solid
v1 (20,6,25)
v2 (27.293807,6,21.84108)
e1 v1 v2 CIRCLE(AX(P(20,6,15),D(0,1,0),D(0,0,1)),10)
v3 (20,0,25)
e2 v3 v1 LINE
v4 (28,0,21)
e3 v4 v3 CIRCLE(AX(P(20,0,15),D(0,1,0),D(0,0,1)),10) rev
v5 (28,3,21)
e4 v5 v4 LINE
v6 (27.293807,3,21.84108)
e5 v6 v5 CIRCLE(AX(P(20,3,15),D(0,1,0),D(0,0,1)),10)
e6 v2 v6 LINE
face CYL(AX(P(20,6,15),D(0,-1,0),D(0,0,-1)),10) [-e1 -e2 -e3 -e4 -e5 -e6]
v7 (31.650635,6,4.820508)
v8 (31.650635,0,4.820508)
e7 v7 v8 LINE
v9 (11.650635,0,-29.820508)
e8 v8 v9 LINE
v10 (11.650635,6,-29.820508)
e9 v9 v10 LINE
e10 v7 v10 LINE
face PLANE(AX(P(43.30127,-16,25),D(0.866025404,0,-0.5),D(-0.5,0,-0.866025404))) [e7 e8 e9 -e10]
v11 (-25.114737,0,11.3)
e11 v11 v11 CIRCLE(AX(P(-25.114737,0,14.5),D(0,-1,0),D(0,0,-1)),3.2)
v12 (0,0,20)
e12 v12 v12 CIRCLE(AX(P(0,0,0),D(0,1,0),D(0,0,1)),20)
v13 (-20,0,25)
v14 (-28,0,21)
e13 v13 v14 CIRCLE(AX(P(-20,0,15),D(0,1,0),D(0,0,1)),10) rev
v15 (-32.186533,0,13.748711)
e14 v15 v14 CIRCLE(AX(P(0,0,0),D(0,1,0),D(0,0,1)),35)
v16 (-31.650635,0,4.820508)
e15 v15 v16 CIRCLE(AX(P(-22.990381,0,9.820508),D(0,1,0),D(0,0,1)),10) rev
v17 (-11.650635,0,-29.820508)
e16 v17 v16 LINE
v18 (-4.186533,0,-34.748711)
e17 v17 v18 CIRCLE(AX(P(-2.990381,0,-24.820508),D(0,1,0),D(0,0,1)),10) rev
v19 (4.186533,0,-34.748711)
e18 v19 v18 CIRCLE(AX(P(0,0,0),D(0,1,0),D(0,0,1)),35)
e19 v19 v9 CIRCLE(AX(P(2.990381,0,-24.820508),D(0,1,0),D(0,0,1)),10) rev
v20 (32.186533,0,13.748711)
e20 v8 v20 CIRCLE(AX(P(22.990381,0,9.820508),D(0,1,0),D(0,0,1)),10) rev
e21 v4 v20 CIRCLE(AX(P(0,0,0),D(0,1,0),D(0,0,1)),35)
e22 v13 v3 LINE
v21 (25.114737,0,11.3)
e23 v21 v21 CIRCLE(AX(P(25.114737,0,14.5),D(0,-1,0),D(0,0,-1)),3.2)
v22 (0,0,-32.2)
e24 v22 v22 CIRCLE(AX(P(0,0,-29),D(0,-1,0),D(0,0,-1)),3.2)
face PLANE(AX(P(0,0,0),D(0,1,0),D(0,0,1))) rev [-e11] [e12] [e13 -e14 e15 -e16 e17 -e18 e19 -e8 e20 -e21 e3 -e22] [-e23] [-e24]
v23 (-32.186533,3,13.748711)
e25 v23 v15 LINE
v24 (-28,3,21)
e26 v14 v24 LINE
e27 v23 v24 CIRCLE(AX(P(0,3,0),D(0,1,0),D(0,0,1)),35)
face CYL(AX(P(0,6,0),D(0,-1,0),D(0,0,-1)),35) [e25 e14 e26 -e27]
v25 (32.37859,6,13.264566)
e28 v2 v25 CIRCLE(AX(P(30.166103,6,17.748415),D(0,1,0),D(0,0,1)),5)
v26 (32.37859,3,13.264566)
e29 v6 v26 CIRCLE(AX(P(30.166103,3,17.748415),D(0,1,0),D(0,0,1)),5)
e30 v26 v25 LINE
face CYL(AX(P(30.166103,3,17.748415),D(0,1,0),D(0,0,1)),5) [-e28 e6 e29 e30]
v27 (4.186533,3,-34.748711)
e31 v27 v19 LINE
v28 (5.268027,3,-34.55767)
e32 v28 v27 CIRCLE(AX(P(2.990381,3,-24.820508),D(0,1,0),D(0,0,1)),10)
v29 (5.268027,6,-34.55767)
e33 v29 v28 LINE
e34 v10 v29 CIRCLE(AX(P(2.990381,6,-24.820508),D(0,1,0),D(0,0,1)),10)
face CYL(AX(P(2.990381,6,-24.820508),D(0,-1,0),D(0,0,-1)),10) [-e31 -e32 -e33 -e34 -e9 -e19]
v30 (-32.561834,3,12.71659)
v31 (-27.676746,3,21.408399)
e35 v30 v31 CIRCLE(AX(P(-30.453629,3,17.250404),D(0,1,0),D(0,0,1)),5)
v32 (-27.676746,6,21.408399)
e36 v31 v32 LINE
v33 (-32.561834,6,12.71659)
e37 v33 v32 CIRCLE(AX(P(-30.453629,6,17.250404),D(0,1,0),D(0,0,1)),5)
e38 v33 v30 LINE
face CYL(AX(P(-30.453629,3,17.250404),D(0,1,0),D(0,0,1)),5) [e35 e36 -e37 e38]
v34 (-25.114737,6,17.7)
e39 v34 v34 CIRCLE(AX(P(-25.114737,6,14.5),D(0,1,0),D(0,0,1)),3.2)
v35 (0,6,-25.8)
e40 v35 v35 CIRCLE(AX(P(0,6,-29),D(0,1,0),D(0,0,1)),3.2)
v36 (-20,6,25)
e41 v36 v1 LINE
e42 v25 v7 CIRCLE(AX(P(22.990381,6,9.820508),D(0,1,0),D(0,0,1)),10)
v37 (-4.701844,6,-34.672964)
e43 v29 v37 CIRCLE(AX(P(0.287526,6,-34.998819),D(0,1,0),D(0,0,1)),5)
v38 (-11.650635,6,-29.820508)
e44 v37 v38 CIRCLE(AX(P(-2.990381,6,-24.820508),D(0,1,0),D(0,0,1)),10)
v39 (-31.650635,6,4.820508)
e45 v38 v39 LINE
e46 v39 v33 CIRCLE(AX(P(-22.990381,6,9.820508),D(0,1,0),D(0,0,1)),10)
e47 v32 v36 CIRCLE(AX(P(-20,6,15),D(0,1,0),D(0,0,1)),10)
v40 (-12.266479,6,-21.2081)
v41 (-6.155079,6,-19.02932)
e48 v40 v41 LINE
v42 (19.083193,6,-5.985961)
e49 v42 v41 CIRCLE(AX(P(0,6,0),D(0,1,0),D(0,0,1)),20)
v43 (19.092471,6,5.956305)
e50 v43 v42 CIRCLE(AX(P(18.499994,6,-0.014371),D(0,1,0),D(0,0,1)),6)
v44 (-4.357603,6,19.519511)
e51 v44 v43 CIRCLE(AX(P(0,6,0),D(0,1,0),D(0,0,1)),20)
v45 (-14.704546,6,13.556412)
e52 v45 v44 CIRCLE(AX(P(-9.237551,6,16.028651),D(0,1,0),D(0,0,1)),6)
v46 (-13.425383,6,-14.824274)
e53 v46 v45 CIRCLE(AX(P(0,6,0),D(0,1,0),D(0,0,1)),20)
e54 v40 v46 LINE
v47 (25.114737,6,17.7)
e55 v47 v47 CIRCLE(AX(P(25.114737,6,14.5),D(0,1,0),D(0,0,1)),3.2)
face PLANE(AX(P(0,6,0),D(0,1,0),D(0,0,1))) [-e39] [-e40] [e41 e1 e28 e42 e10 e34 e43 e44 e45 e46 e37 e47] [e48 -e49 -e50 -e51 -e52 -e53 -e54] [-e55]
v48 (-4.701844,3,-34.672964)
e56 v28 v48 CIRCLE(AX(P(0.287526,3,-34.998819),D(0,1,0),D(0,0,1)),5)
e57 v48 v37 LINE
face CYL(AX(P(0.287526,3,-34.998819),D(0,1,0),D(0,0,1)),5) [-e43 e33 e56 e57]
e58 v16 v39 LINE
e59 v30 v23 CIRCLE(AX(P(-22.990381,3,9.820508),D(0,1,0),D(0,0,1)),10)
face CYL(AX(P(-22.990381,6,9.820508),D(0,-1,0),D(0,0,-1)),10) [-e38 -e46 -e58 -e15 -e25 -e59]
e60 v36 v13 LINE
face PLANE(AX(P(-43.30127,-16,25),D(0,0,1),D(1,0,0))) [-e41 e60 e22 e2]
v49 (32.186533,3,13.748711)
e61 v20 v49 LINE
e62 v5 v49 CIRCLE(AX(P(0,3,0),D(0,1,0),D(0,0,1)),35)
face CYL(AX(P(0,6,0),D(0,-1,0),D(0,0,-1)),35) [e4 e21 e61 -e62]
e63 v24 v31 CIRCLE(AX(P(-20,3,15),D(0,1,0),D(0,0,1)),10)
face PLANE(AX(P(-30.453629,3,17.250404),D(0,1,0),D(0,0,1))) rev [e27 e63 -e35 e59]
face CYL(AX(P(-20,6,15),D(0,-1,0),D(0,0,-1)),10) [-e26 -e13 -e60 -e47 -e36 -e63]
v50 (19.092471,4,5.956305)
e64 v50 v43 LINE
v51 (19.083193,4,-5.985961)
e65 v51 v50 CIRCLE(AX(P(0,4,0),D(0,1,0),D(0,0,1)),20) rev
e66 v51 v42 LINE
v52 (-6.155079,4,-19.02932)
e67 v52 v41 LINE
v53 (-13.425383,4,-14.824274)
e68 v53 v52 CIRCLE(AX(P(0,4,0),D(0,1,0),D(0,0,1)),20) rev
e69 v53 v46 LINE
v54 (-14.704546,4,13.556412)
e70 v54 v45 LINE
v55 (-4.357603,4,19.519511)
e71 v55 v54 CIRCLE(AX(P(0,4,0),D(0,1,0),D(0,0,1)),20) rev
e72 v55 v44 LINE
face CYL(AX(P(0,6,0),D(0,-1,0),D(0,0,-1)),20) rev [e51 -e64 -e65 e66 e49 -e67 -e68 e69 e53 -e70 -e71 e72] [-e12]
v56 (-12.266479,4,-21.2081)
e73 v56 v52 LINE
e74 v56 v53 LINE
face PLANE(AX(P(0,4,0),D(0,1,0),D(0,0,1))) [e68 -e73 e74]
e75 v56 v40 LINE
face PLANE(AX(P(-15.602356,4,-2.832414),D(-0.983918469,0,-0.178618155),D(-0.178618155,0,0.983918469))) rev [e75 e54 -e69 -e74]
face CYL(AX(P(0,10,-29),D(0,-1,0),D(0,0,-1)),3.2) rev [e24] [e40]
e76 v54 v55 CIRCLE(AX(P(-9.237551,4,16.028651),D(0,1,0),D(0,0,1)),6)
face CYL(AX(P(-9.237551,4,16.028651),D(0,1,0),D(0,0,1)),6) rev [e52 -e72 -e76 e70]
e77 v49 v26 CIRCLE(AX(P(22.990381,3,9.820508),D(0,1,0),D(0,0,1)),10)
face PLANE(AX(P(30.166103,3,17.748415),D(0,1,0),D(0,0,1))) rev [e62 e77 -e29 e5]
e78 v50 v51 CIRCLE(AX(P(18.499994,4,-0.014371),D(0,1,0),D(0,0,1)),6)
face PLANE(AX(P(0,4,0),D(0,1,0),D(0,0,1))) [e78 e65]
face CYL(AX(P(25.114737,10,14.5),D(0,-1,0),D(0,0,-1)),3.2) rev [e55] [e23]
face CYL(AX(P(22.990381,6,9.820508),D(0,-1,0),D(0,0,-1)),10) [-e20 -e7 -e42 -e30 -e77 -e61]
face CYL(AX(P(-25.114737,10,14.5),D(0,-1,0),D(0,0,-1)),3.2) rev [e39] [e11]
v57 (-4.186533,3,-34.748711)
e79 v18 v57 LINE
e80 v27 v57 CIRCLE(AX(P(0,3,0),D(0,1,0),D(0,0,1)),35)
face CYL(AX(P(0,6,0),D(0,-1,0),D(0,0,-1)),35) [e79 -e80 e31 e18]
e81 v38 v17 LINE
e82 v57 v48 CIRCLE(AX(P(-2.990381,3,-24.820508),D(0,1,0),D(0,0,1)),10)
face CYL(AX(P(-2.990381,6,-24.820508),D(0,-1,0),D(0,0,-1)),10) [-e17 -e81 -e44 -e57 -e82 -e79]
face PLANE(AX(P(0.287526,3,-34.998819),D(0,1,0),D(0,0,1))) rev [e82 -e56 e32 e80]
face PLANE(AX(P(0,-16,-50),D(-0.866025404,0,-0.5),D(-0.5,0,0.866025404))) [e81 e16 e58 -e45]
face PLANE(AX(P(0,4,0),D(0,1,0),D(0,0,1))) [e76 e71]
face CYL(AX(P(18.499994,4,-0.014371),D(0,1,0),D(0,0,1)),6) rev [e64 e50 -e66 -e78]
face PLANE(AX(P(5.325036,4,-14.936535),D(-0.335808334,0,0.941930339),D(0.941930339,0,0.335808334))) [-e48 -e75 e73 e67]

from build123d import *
from build123d.topology import SkipClean

# Parameters (mm, degrees)
SKETCH1_R           = 18.5
BOSS_EXTRUDE1_DEPTH = 3.5
SKETCH2_R           = 35
SKETCH2_R_2         = 20
SKETCH2_R_3         = 2.8
BOSS_EXTRUDE2_DEPTH = 6
SKETCH5_R           = 5
BOSS_EXTRUDE4_DEPTH = 3
CUT_EXTRUDE1_START  = -10
SKETCH3_R           = 18.5
CUT_EXTRUDE1_DEPTH  = 10
SKETCH12_R          = 72.135852014
CUT_EXTRUDE2_DEPTH  = 22
FILLET1_R           = 10
SKETCH15_R          = 20
SKETCH15_R_2        = 6
CUT_EXTRUDE4_DEPTH  = 2
SKETCH4_R           = 3.2
CUT_EXTRUDE5_DEPTH  = 10


with BuildPart() as part:
    # Sketch1 → Boss-Extrude1 (new body)
    with BuildSketch(Plane(origin=(0, 0, 0), x_dir=(1, 0, 0), z_dir=(0, 1, 0))):
        with Locations(Location((0, 0, 0), (0, 0, 270))):
            Circle(SKETCH1_R)
    extrude(amount=BOSS_EXTRUDE1_DEPTH)

    # Sketch3 → Cut-Extrude1 (cut)
    with BuildSketch(Plane(origin=(0, 3.5, 0), x_dir=(1, 0, 0), z_dir=(0, 1, 0)).offset(CUT_EXTRUDE1_START)):
        Circle(SKETCH3_R)
    extrude(amount=CUT_EXTRUDE1_DEPTH, mode=Mode.SUBTRACT)


with BuildPart() as body_2:
    # Sketch2 → Boss-Extrude2 (new body)
    with BuildSketch(Plane(origin=(0, 0, 0), x_dir=(1, 0, 0), z_dir=(0, 1, 0))):
        with Locations(Location((0, 0, 0), (0, 0, 270))):
            Circle(SKETCH2_R)
        with Locations(Location((0, 0, 0), (0, 0, 270))):
            Circle(SKETCH2_R_2, mode=Mode.SUBTRACT)
        with Locations(Location((0, 29, 0), (0, 0, 270))):
            Circle(SKETCH2_R_3, mode=Mode.SUBTRACT)
        with Locations(Location((25.11473671, -14.5, 0), (0, 0, 270))):
            Circle(SKETCH2_R_3, mode=Mode.SUBTRACT)
        with Locations(Location((-25.11473671, -14.5, 0), (0, 0, 270))):
            Circle(SKETCH2_R_3, mode=Mode.SUBTRACT)
    extrude(amount=BOSS_EXTRUDE2_DEPTH)

    # Sketch5 → Boss-Extrude4 (add)
    with BuildSketch(Plane(origin=(0, 6, 0), x_dir=(1, 0, 0), z_dir=(0, 1, 0))):
        with Locations((-30.453629482, -17.250404383)):
            Circle(SKETCH5_R)
        with Locations((0.28752632, 34.99881896)):
            Circle(SKETCH5_R)
        with Locations((30.166103162, -17.748414577)):
            Circle(SKETCH5_R)
    extrude(amount=-BOSS_EXTRUDE4_DEPTH)

    # Sketch12 → Cut-Extrude2 (cut)
    with BuildSketch(Plane(origin=(0, 6, 0), x_dir=(1, 0, 0), z_dir=(0, 1, 0))):
        Circle(SKETCH12_R)
        Polygon((0, 50), (-43.301270189, -25), (43.301270189, -25), align=None, mode=Mode.SUBTRACT)
    extrude(amount=-CUT_EXTRUDE2_DEPTH, mode=Mode.SUBTRACT)

    # Fillet1
    # the kernel refuses this fillet: 10 mm, written as the material it takes off along each edge
    with BuildSketch(Plane(origin=(-24.494897428, 19.2960859, 25), x_dir=(-0.6590478202651217, 0, -0.7521010374968192), z_dir=(0, -1, 0))) as fillet1_piece_1_section:
        with BuildLine():
            CenterArc((4.558658023, 9.971095222), FILLET1_R, 221.227294524, 53.130102354)
            Line((-2.962352352, 3.380617019), (0, 0))
            ThreePointArc((0, 0), (2.65921718, -0.101166725), (5.31843436, 0))
        make_face()
    fillet1_piece_1 = extrude(amount=32.5921718, mode=Mode.PRIVATE)
    fillet1_piece_1 = fillet1_piece_1 - Plane(origin=(-30.453629482, 4.5, 17.250404383), x_dir=(1, 0, 0), z_dir=(0, 1, 0)) * Cylinder(5, 87, mode=Mode.PRIVATE)
    add(fillet1_piece_1, mode=Mode.SUBTRACT)
    with BuildSketch(Plane(origin=(-24.494897428, 19.2960859, 25), x_dir=(-0.6590478202651217, 0, -0.7521010374968192), z_dir=(0, -1, 0))) as fillet1_piece_2_section:
        with BuildLine():
            CenterArc((4.558658023, 9.971095222), FILLET1_R, 221.227294524, 53.130102354)
            Line((-2.962352352, 3.380617019), (0, 0))
            ThreePointArc((0, 0), (2.65921718, -0.101166725), (5.31843436, 0))
        make_face()
    fillet1_piece_2 = extrude(amount=32.5921718, mode=Mode.PRIVATE)
    fillet1_piece_2 = split(fillet1_piece_2, bisect_by=Plane(origin=(-27.761621835, 3, 21.309124186), z_dir=(0, -1, 0)), keep=Keep.TOP, mode=Mode.PRIVATE)
    add(fillet1_piece_2, mode=Mode.SUBTRACT)
    with BuildSketch(Plane(origin=(24.494897428, 19.2960859, 25), x_dir=(-1, 0, 0), z_dir=(0, -1, 0))) as fillet1_piece_3_section:
        with BuildLine():
            CenterArc((4.494897428, 10), FILLET1_R, 216.869897646, 53.130102354)
            ThreePointArc((-3.505102572, 4), (-1.828638885, 1.933326291), (0, 0))
            Line((0, 0), (4.494897428, 0))
        make_face()
    fillet1_piece_3 = extrude(amount=32.5921718, mode=Mode.PRIVATE)
    fillet1_piece_3 = fillet1_piece_3 - Plane(origin=(30.166103162, 4.5, 17.748414577), x_dir=(1, 0, 0), z_dir=(0, 1, 0)) * Cylinder(5, 84, mode=Mode.PRIVATE)
    add(fillet1_piece_3, mode=Mode.SUBTRACT)
    with BuildSketch(Plane(origin=(24.494897428, 19.2960859, 25), x_dir=(-1, 0, 0), z_dir=(0, -1, 0))) as fillet1_piece_4_section:
        with BuildLine():
            CenterArc((4.494897428, 10), FILLET1_R, 216.869897646, 53.130102354)
            ThreePointArc((-3.505102572, 4), (-1.828638885, 1.933326291), (0, 0))
            Line((0, 0), (4.494897428, 0))
        make_face()
    fillet1_piece_4 = extrude(amount=32.5921718, mode=Mode.PRIVATE)
    fillet1_piece_4 = split(fillet1_piece_4, bisect_by=Plane(origin=(27.488157838, 3, 21.643747381), z_dir=(0, -1, 0)), keep=Keep.TOP, mode=Mode.PRIVATE)
    add(fillet1_piece_4, mode=Mode.SUBTRACT)
    with BuildSketch(Plane(origin=(-9.403186381, 19.2960859, -33.713203436), x_dir=(-0.5000000000000003, 0, 0.8660254037844386), z_dir=(0, -1, 0))) as fillet1_piece_5_section:
        with BuildLine():
            CenterArc((4.494897428, -10), FILLET1_R, 90, 53.130102354)
            ThreePointArc((-3.505102572, -4), (-1.828638885, -1.933326291), (0, 0))
            Line((0, 0), (4.494897428, 0))
        make_face()
    fillet1_piece_5 = extrude(amount=32.5921718, mode=Mode.PRIVATE)
    fillet1_piece_5 = fillet1_piece_5 - Plane(origin=(0.28752632, 4.5, -34.99881896), x_dir=(1, 0, 0), z_dir=(0, 1, 0)) * Cylinder(5, 84, mode=Mode.PRIVATE)
    add(fillet1_piece_5, mode=Mode.SUBTRACT)
    with BuildSketch(Plane(origin=(-9.403186381, 19.2960859, -33.713203436), x_dir=(-0.5000000000000003, 0, 0.8660254037844386), z_dir=(0, -1, 0))) as fillet1_piece_6_section:
        with BuildLine():
            CenterArc((4.494897428, -10), FILLET1_R, 90, 53.130102354)
            ThreePointArc((-3.505102572, -4), (-1.828638885, -1.933326291), (0, 0))
            Line((0, 0), (4.494897428, 0))
        make_face()
    fillet1_piece_6 = extrude(amount=32.5921718, mode=Mode.PRIVATE)
    fillet1_piece_6 = split(fillet1_piece_6, bisect_by=Plane(origin=(-4.57343196, 3, -34.696831852), z_dir=(0, -1, 0)), keep=Keep.TOP, mode=Mode.PRIVATE)
    add(fillet1_piece_6, mode=Mode.SUBTRACT)
    with BuildSketch(Plane(origin=(-33.898083809, 19.2960859, 8.713203436), x_dir=(0.32181469455231854, 0, 0.9468026734067654), z_dir=(0, -1, 0))) as fillet1_piece_7_section:
        with BuildLine():
            CenterArc((4.558658023, -9.971095222), FILLET1_R, 85.642603122, 53.130102354)
            Line((-2.962352352, -3.380617019), (0, 0))
            ThreePointArc((0, 0), (2.65921718, 0.101166725), (5.31843436, 0))
        make_face()
    fillet1_piece_7 = extrude(amount=32.5921718, mode=Mode.PRIVATE)
    fillet1_piece_7 = fillet1_piece_7 - Plane(origin=(-30.453629482, 4.5, 17.250404383), x_dir=(1, 0, 0), z_dir=(0, 1, 0)) * Cylinder(5, 87, mode=Mode.PRIVATE)
    add(fillet1_piece_7, mode=Mode.SUBTRACT)
    with BuildSketch(Plane(origin=(-33.898083809, 19.2960859, 8.713203436), x_dir=(0.32181469455231854, 0, 0.9468026734067654), z_dir=(0, -1, 0))) as fillet1_piece_8_section:
        with BuildLine():
            CenterArc((4.558658023, -9.971095222), FILLET1_R, 85.642603122, 53.130102354)
            Line((-2.962352352, -3.380617019), (0, 0))
            ThreePointArc((0, 0), (2.65921718, 0.101166725), (5.31843436, 0))
        make_face()
    fillet1_piece_8 = extrude(amount=32.5921718, mode=Mode.PRIVATE)
    fillet1_piece_8 = split(fillet1_piece_8, bisect_by=Plane(origin=(-32.488113984, 3, 12.9835693), z_dir=(0, -1, 0)), keep=Keep.TOP, mode=Mode.PRIVATE)
    add(fillet1_piece_8, mode=Mode.SUBTRACT)
    with BuildSketch(Plane(origin=(33.898083809, 19.2960859, 8.713203436), x_dir=(-0.3218146945523175, 0, 0.9468026734067657), z_dir=(0, -1, 0))) as fillet1_piece_9_section:
        with BuildLine():
            CenterArc((4.558658023, 9.971095222), FILLET1_R, 221.227294524, 53.130102354)
            Line((-2.962352352, 3.380617019), (0, 0))
            ThreePointArc((0, 0), (2.65921718, -0.101166725), (5.31843436, 0))
        make_face()
    fillet1_piece_9 = extrude(amount=32.5921718, mode=Mode.PRIVATE)
    fillet1_piece_9 = fillet1_piece_9 - Plane(origin=(30.166103162, 4.5, 17.748414577), x_dir=(1, 0, 0), z_dir=(0, 1, 0)) * Cylinder(5, 87, mode=Mode.PRIVATE)
    add(fillet1_piece_9, mode=Mode.SUBTRACT)
    with BuildSketch(Plane(origin=(33.898083809, 19.2960859, 8.713203436), x_dir=(-0.3218146945523175, 0, 0.9468026734067657), z_dir=(0, -1, 0))) as fillet1_piece_10_section:
        with BuildLine():
            CenterArc((4.558658023, 9.971095222), FILLET1_R, 221.227294524, 53.130102354)
            Line((-2.962352352, 3.380617019), (0, 0))
            ThreePointArc((0, 0), (2.65921718, -0.101166725), (5.31843436, 0))
        make_face()
    fillet1_piece_10 = extrude(amount=32.5921718, mode=Mode.PRIVATE)
    fillet1_piece_10 = split(fillet1_piece_10, bisect_by=Plane(origin=(32.335053795, 3, 13.387707666), z_dir=(0, -1, 0)), keep=Keep.TOP, mode=Mode.PRIVATE)
    add(fillet1_piece_10, mode=Mode.SUBTRACT)
    with BuildSketch(Plane(origin=(9.403186381, 19.2960859, -33.713203436), x_dir=(-0.9808625148174394, 0, -0.19470163590994477), z_dir=(0, -1, 0))) as fillet1_piece_11_section:
        with BuildLine():
            CenterArc((4.558658023, -9.971095222), FILLET1_R, 85.642603122, 53.130102354)
            Line((-2.962352352, -3.380617019), (0, 0))
            ThreePointArc((0, 0), (2.65921718, 0.101166725), (5.31843436, 0))
        make_face()
    fillet1_piece_11 = extrude(amount=32.5921718, mode=Mode.PRIVATE)
    fillet1_piece_11 = fillet1_piece_11 - Plane(origin=(0.28752632, 4.5, -34.99881896), x_dir=(1, 0, 0), z_dir=(0, 1, 0)) * Cylinder(5, 87, mode=Mode.PRIVATE)
    add(fillet1_piece_11, mode=Mode.SUBTRACT)
    with BuildSketch(Plane(origin=(9.403186381, 19.2960859, -33.713203436), x_dir=(-0.9808625148174394, 0, -0.19470163590994477), z_dir=(0, -1, 0))) as fillet1_piece_12_section:
        with BuildLine():
            CenterArc((4.558658023, -9.971095222), FILLET1_R, 85.642603122, 53.130102354)
            Line((-2.962352352, -3.380617019), (0, 0))
            ThreePointArc((0, 0), (2.65921718, 0.101166725), (5.31843436, 0))
        make_face()
    fillet1_piece_12 = extrude(amount=32.5921718, mode=Mode.PRIVATE)
    fillet1_piece_12 = split(fillet1_piece_12, bisect_by=Plane(origin=(4.999956146, 3, -34.627316681), z_dir=(0, -1, 0)), keep=Keep.TOP, mode=Mode.PRIVATE)
    add(fillet1_piece_12, mode=Mode.SUBTRACT)

    # Sketch15 → Cut-Extrude4 (cut)
    with SkipClean():  # the faces are left unmerged after this step: merging them gives an invalid solid
        with BuildSketch(Plane(origin=(0, 6, 0), x_dir=(1, 0, 0), z_dir=(0, 1, 0))):
            with Locations(Location((0, 0, 0), (0, 0, 107.923924211))):
                Circle(SKETCH15_R)
            with Locations((-9.237551188, -16.028650849)):
                Circle(SKETCH15_R_2)
            with Locations((18.499994418, 0.014371427)):
                Circle(SKETCH15_R_2)
            with BuildLine():
                Line((-12.266478871, 21.208099776), (-13.42538307, 14.824273656))
                ThreePointArc((-13.42538307, 14.824273656), (-10.01345214, 17.312734511), (-6.155078704, 19.029319645))
                Line((-6.155078704, 19.029319645), (-12.266478871, 21.208099776))
            make_face()
        extrude(amount=-CUT_EXTRUDE4_DEPTH, mode=Mode.SUBTRACT)

    # Sketch4 → Cut-Extrude5 (cut)
    with SkipClean():  # the faces are left unmerged after this step: merging them gives an invalid solid
        with BuildSketch(Plane.XZ):
            with Locations(Location((-25.11473671, 14.5, 0), (0, 0, 270))):
                Circle(SKETCH4_R)
            with Locations(Location((25.11473671, 14.5, 0), (0, 0, 270))):
                Circle(SKETCH4_R)
            with Locations(Location((0, -29, 0), (0, 0, 270))):
                Circle(SKETCH4_R)
        extrude(amount=-CUT_EXTRUDE5_DEPTH, mode=Mode.SUBTRACT)


solid = body_2.part
